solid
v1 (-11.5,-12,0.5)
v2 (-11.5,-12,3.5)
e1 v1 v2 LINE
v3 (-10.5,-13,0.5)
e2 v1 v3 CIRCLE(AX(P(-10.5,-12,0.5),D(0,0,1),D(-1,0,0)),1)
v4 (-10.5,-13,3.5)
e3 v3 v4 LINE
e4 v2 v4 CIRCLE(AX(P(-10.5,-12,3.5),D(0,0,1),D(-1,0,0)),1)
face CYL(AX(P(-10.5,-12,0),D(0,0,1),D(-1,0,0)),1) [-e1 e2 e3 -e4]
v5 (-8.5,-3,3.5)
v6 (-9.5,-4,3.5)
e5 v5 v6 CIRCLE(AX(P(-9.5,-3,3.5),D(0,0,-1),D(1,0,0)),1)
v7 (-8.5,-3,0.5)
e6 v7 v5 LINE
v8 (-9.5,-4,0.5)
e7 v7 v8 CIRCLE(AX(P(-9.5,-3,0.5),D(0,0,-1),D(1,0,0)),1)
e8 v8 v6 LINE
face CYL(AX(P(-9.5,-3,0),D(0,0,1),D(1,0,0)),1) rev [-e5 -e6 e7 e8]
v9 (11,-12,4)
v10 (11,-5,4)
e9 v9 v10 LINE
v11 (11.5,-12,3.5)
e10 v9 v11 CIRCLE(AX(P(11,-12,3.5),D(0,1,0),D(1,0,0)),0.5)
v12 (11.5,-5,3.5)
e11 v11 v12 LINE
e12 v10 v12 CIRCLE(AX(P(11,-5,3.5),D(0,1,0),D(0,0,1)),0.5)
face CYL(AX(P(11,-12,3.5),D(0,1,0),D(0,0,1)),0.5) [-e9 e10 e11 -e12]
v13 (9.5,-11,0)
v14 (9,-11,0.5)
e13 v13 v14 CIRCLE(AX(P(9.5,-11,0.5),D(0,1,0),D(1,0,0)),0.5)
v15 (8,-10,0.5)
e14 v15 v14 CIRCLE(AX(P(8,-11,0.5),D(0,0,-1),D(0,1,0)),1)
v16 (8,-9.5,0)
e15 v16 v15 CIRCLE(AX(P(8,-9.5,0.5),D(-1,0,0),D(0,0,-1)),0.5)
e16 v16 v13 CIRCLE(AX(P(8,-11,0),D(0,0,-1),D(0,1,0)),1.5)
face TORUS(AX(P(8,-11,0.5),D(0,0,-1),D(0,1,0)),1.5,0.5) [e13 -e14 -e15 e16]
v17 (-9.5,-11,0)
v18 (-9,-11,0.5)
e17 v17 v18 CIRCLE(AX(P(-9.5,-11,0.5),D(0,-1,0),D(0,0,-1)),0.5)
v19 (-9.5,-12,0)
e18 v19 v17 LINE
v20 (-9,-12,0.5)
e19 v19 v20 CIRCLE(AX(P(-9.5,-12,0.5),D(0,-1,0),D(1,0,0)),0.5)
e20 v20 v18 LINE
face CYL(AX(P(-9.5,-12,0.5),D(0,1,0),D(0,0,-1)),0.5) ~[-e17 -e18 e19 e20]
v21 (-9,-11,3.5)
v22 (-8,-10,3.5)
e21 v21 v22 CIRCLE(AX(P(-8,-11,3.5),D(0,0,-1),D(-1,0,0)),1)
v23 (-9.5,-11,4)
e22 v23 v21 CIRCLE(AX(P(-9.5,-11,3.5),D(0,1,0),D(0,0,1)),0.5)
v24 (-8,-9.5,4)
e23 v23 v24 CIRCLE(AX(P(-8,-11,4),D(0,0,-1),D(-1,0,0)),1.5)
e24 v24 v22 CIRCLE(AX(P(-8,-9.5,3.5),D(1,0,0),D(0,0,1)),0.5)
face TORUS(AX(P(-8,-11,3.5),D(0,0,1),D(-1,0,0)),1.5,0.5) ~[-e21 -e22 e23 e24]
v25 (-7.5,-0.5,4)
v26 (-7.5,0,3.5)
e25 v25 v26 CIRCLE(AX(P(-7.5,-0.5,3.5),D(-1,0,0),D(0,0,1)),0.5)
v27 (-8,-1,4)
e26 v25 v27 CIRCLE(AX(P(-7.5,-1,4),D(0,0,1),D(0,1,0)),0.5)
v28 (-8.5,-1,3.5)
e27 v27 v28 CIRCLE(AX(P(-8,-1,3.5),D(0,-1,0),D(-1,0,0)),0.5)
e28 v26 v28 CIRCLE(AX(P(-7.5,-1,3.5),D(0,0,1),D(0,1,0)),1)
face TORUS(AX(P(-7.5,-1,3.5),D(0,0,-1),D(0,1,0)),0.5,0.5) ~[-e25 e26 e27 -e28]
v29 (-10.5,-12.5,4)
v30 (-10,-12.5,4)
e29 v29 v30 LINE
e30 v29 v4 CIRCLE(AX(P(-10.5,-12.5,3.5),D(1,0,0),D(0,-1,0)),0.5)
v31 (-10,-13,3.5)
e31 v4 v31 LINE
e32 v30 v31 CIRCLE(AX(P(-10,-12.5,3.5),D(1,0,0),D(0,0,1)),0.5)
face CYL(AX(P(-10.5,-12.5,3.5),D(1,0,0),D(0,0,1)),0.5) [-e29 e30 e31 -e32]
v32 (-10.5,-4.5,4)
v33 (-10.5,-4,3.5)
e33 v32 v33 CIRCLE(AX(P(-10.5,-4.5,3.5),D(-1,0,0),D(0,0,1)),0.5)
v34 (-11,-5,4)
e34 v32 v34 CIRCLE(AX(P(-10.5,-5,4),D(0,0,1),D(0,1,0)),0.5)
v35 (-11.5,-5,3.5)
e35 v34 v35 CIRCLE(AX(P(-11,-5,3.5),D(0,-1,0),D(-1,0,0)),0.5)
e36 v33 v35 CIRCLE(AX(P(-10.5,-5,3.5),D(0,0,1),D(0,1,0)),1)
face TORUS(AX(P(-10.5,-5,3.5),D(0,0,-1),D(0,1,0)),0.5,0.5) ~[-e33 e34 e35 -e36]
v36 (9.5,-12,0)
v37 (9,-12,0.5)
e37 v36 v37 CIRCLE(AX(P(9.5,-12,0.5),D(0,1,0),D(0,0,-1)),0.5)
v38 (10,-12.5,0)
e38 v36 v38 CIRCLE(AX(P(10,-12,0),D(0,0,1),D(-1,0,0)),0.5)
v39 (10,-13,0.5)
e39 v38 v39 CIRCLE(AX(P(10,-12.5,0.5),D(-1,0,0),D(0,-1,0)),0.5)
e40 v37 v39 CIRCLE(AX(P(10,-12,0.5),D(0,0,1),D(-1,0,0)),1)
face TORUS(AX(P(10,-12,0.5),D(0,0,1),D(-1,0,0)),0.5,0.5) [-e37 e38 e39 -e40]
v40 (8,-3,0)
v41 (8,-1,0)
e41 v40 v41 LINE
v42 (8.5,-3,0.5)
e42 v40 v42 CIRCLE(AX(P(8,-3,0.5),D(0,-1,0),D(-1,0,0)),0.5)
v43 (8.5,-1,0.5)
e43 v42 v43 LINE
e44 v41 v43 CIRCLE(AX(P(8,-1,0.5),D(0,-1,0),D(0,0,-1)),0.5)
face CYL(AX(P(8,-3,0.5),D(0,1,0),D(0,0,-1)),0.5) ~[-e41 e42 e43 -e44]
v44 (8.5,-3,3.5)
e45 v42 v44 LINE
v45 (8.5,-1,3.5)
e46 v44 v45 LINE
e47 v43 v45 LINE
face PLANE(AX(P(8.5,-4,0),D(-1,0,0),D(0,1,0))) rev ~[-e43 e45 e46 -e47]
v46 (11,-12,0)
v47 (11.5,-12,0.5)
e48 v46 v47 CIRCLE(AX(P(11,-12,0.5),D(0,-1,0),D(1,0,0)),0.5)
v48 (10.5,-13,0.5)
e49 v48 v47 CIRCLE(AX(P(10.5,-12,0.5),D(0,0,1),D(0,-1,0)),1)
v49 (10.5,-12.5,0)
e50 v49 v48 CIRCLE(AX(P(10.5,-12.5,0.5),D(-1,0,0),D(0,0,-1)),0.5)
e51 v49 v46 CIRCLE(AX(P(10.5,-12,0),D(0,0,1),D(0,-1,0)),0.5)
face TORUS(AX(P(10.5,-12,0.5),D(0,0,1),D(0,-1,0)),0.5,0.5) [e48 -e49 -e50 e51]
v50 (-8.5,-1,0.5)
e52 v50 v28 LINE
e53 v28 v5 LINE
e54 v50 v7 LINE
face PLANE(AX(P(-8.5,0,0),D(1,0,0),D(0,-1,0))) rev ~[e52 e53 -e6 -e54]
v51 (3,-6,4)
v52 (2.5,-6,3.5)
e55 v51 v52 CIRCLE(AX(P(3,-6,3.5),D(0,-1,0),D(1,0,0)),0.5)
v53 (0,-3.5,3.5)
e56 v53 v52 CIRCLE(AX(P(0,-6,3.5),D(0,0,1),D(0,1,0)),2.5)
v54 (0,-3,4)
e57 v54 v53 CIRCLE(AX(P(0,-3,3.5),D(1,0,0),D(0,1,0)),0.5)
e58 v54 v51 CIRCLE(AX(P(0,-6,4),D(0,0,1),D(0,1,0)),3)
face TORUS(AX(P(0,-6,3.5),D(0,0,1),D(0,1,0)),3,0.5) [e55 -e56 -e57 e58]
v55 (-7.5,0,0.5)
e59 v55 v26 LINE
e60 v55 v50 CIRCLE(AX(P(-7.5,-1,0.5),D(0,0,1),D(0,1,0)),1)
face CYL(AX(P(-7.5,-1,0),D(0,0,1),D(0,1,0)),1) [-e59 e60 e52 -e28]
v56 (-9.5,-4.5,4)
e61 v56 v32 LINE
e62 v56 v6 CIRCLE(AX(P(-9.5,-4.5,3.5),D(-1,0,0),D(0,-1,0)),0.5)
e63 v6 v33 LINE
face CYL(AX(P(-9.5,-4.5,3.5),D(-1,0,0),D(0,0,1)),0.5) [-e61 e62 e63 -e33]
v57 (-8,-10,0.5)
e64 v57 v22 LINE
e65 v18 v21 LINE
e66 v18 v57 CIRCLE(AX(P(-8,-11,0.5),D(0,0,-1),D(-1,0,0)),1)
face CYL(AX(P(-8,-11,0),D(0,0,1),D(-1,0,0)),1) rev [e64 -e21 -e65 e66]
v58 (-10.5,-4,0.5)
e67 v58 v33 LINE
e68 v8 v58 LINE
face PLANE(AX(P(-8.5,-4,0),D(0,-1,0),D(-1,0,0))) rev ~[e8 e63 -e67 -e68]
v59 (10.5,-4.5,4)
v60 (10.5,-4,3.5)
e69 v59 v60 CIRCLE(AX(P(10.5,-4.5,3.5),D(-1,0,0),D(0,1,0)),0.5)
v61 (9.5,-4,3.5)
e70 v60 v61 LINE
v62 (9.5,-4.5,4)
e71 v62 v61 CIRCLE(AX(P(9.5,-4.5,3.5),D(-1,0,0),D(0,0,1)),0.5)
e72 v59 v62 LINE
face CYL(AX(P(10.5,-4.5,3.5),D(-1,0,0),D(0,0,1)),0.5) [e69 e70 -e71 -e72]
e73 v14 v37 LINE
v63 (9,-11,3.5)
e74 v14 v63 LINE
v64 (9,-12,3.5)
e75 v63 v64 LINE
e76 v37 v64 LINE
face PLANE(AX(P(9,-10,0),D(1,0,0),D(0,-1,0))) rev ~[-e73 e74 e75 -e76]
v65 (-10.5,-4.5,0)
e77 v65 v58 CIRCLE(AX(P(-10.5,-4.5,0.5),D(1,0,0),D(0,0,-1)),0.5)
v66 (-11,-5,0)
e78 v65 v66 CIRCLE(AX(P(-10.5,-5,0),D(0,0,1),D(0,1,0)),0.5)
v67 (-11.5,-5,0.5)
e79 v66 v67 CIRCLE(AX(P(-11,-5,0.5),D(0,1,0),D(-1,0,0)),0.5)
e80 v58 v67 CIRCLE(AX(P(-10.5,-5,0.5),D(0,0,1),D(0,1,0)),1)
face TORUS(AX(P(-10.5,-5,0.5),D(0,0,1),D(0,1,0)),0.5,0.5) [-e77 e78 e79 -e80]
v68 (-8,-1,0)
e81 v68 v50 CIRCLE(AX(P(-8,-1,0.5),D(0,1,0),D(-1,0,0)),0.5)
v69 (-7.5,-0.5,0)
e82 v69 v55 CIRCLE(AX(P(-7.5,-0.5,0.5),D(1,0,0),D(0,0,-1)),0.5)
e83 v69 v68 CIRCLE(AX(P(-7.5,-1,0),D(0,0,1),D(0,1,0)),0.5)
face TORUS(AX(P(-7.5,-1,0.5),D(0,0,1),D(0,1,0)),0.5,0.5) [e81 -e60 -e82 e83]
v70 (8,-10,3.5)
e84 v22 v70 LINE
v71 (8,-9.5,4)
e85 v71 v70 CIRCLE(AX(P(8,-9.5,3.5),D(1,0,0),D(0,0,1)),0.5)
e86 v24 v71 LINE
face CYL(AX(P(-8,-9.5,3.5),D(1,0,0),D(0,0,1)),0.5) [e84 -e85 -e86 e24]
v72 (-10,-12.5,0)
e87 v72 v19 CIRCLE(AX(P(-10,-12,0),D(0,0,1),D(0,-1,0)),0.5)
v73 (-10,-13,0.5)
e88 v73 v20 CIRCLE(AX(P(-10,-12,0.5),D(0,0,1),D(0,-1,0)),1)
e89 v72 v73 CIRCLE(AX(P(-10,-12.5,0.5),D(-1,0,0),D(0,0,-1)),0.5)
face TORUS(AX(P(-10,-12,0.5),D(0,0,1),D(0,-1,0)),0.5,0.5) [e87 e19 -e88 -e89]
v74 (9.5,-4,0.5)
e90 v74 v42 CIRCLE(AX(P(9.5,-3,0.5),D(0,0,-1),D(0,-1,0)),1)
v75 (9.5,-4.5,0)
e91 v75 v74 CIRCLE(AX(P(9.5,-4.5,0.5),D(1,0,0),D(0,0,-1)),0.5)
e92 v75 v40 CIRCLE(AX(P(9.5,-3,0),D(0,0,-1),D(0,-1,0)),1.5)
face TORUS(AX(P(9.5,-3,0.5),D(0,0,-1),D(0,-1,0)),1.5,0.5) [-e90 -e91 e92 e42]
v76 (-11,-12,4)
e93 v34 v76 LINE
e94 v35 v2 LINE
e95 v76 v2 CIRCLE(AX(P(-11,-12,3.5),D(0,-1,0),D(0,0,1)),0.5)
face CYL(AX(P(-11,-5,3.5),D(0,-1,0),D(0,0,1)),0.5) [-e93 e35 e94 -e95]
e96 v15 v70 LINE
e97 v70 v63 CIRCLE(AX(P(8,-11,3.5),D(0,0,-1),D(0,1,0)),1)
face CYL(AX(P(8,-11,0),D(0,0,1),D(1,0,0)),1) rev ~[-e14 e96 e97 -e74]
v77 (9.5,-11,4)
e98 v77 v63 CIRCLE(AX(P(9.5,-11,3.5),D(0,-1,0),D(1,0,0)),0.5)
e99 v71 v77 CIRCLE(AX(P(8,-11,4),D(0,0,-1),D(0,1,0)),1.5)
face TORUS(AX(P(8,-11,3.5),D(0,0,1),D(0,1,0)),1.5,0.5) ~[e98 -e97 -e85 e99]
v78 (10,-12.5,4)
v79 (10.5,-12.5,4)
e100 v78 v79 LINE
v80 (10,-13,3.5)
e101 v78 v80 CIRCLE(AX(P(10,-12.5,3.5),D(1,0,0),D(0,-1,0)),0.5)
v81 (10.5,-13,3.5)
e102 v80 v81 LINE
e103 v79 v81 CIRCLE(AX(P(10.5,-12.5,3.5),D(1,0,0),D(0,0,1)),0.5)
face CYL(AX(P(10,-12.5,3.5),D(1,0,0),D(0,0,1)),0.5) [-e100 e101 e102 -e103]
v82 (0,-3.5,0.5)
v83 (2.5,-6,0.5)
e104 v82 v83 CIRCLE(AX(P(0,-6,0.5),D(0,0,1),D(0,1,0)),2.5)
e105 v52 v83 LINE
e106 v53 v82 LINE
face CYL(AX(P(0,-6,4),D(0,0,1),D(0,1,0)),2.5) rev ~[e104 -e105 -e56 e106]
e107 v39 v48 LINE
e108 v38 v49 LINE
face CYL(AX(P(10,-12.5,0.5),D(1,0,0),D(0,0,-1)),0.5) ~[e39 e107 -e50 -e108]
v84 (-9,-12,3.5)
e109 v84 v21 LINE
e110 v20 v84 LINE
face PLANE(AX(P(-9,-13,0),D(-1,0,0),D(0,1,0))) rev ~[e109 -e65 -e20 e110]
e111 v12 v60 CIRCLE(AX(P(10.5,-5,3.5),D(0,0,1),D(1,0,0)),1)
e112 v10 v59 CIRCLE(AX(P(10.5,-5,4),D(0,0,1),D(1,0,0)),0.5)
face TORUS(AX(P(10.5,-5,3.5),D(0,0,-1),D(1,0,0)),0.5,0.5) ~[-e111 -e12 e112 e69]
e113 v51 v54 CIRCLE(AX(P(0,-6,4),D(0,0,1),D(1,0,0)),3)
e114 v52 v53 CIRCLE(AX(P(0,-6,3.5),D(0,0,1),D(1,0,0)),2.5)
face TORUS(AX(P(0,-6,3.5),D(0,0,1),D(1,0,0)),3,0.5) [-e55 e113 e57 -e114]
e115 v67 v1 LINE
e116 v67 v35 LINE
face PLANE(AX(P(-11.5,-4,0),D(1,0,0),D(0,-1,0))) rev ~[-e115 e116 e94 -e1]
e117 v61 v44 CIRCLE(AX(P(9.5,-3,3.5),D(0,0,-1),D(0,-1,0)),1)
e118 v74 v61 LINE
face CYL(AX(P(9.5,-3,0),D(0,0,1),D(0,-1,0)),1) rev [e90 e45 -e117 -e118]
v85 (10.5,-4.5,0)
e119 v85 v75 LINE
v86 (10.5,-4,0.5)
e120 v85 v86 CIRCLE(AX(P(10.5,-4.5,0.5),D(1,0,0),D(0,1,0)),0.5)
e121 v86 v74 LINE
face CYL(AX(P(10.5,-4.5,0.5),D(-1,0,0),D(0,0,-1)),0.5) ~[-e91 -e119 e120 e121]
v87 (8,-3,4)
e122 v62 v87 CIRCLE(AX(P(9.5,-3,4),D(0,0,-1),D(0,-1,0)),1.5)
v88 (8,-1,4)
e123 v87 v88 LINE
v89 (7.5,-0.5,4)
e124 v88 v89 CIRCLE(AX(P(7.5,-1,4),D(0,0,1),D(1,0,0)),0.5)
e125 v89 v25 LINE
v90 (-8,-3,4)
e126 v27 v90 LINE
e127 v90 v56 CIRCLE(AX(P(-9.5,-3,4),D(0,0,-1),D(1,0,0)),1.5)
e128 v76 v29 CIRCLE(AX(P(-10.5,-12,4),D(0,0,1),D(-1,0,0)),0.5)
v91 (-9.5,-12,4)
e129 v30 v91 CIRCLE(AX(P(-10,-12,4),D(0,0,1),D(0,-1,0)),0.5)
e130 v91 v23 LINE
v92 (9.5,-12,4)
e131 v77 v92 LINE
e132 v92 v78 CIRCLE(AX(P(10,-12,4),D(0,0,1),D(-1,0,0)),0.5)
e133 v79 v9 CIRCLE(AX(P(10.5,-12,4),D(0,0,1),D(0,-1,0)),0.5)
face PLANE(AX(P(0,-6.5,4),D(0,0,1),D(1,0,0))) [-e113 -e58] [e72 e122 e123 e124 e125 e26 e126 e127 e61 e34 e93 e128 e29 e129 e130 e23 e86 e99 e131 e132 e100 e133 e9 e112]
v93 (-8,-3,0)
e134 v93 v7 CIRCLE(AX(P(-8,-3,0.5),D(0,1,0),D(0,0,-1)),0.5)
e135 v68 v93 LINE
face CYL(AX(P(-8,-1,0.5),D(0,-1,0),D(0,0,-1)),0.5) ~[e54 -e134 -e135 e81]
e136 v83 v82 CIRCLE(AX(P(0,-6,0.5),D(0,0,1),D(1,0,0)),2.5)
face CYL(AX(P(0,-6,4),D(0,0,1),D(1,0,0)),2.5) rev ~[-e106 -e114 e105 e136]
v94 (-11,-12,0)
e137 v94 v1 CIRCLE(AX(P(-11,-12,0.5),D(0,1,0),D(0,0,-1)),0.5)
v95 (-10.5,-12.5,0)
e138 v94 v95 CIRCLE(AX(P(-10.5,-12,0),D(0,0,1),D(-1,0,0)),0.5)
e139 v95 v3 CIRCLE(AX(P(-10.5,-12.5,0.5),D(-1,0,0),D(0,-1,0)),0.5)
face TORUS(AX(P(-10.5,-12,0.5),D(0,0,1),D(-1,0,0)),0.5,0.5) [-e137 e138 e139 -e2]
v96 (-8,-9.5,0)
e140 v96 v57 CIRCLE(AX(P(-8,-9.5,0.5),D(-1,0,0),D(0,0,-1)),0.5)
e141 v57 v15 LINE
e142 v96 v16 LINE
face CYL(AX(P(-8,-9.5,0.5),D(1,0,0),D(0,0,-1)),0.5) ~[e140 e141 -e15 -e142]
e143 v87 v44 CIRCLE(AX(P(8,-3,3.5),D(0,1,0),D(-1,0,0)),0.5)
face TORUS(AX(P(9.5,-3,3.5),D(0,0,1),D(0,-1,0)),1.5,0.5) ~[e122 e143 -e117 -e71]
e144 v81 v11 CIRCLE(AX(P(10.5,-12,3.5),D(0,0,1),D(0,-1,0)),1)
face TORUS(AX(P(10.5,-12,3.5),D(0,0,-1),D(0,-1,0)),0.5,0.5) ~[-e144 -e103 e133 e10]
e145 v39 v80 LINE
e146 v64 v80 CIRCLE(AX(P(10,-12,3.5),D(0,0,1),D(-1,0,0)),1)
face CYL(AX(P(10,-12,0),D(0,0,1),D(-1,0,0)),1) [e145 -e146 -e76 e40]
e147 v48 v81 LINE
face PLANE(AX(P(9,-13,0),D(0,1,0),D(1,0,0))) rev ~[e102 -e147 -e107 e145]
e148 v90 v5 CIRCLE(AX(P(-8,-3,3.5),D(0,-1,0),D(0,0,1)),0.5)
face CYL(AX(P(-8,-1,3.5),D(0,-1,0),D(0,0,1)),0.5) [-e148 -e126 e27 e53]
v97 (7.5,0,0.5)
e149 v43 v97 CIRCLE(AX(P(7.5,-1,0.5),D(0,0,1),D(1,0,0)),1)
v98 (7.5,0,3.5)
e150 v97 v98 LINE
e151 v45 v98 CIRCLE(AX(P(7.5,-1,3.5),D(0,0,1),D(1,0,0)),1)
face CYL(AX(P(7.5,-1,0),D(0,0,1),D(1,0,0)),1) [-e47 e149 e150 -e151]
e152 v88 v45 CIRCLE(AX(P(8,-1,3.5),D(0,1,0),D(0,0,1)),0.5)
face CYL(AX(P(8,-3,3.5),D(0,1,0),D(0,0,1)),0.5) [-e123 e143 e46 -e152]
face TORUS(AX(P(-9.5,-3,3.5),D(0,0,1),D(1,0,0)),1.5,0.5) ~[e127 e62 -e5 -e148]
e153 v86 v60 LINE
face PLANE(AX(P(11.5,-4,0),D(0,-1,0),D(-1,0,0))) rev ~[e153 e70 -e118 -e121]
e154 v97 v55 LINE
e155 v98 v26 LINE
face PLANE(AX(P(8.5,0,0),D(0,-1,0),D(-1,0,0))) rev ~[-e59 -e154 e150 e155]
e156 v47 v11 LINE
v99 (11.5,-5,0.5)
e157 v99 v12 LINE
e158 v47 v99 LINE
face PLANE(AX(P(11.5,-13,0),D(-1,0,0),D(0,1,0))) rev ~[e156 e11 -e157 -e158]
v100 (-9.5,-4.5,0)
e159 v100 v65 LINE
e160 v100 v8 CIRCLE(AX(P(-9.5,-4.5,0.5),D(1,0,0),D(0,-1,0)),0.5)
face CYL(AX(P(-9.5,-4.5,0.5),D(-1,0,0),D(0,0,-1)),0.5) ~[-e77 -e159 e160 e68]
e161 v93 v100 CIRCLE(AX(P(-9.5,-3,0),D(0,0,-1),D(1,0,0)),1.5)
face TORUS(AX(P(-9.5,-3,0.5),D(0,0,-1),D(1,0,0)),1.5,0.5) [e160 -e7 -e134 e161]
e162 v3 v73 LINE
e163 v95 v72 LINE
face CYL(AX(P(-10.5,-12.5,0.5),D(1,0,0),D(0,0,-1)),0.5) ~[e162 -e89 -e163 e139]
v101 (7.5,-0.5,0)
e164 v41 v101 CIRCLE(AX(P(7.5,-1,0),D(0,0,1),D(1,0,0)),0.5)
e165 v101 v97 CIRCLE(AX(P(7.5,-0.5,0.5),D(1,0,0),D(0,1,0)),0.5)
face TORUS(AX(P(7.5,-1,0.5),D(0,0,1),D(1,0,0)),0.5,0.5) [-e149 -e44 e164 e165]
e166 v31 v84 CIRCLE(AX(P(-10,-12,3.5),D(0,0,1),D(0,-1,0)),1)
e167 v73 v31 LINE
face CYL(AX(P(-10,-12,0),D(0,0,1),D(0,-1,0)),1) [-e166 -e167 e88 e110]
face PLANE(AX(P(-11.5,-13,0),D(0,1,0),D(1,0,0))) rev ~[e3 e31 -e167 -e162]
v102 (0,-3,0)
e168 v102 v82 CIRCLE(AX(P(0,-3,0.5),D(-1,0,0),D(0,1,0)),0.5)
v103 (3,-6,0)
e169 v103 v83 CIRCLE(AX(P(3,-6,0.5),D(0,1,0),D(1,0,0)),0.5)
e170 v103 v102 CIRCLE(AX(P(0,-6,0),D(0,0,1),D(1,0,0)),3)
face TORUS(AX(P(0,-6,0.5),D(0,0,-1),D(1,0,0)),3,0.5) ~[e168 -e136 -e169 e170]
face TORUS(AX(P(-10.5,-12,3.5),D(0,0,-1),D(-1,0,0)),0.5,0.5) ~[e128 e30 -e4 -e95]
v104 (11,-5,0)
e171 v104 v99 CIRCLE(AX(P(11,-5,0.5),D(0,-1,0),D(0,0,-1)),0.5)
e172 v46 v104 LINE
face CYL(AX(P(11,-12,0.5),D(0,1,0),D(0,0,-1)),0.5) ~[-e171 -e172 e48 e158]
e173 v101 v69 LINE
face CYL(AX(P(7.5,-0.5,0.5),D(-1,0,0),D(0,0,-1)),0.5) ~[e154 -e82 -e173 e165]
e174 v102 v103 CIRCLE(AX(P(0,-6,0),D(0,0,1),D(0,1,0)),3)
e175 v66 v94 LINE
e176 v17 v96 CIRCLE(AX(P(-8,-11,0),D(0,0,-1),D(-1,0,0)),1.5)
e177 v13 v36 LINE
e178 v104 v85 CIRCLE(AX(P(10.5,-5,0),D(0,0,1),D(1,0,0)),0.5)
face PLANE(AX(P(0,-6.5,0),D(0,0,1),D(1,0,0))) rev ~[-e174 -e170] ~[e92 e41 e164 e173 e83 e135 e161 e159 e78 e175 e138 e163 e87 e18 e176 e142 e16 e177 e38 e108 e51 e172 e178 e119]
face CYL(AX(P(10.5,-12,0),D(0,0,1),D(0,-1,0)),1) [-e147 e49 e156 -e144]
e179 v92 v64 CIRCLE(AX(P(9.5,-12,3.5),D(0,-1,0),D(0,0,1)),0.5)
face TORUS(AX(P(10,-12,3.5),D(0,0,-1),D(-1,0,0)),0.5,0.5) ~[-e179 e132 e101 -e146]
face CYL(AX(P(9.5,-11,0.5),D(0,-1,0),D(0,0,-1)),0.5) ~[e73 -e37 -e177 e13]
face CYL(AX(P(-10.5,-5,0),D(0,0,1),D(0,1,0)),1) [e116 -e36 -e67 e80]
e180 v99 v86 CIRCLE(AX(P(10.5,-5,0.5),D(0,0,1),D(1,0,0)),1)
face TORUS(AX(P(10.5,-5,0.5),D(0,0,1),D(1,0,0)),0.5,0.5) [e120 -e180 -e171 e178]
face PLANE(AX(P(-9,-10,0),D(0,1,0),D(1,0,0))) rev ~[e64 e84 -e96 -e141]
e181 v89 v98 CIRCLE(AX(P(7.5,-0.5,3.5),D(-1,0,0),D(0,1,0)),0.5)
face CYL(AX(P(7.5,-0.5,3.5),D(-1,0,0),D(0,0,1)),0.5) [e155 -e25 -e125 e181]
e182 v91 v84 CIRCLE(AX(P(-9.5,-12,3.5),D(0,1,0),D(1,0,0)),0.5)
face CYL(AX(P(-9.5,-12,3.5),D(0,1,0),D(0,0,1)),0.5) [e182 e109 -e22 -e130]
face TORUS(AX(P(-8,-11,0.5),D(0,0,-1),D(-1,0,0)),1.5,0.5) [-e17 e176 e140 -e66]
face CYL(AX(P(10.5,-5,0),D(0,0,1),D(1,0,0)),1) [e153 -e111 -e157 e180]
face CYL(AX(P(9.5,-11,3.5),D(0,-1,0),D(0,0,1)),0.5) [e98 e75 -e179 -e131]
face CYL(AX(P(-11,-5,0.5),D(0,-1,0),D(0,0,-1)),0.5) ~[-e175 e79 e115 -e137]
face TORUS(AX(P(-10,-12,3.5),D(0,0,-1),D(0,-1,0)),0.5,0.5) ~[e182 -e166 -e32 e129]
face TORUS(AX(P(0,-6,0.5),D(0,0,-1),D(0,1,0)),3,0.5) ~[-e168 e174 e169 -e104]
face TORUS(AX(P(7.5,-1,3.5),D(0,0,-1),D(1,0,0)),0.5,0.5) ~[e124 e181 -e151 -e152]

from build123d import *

# Parameters (mm, degrees)
F1_DEPTH = 4
F2_R     = 1
F3_R     = 0.5
F5_DEPTH = 4.001
F6_R     = 0.5


# Not quite as in the source:
# - a feature names something its author has since deleted; it is built from what else it names


with BuildPart() as f1:
    # F0 (on Top) → F1 (new body)
    with BuildSketch(Plane.XY):
        Polygon((9, -10), (9, -13), (11.5, -13), (11.5, -4), (8.5, -4), (8.5, 0), (-8.5, 0), (-8.5, -4), (-11.5, -4), (-11.5, -13), (-9, -13), (-9, -10), align=None)
    extrude(amount=F1_DEPTH)

    # F2
    f2_edges = [f1.edges().sort_by_distance(p)[0] for p in [
        (-9, -13, 2),
        (-9, -10, 2),
        (9, -10, 2),
        (9, -13, 2),
        (-11.5, -4, 2),
        (-8.5, -4, 2),
        (-8.5, 0, 2),
        (8.5, 0, 2),
        (8.5, -4, 2),
        (11.5, -4, 2),
        (11.5, -13, 2),
        (-11.5, -13, 2),
    ]]
    fillet(f2_edges, radius=F2_R)

    # F3
    f3_edges = [f1.edges().sort_by_distance(p)[0] for p in [
        (0, -10, 4),
        (-9, -11.5, 4),
        (9, -11.5, 4),
        (8.707107, -10.292893, 4),
        (9.292893, -12.707107, 4),
        (10.25, -13, 4),
        (-8.707107, -10.292893, 4),
        (11.207107, -12.707107, 4),
        (11.5, -8.5, 4),
        (-9.292893, -12.707107, 4),
        (11.207107, -4.292893, 4),
        (-10.25, -13, 4),
        (10, -4, 4),
        (-11.207107, -12.707107, 4),
        (8.792893, -3.707107, 4),
        (-11.5, -8.5, 4),
        (8.5, -2, 4),
        (-11.207107, -4.292893, 4),
        (8.207107, -0.292893, 4),
        (-10, -4, 4),
        (0, 0, 4),
        (-8.792893, -3.707107, 4),
        (-8.207107, -0.292893, 4),
        (-8.5, -2, 4),
        (0, -10, 0),
        (10.25, -13, 0),
        (9, -11.5, 0),
        (-9, -11.5, 0),
        (-10.25, -13, 0),
    ]]
    fillet(f3_edges, radius=F3_R)

    # F4 (on face) → F5 (cut, through all)
    with BuildSketch(Plane.XY.offset(4)):
        with BuildLine():
            ThreePointArc((2.5, -6), (1.767766953, -4.232233047), (0, -3.5))
            ThreePointArc((0, -3.5), (-1.767766953, -7.767766953), (2.5, -6))
        make_face()
    extrude(amount=-F5_DEPTH, mode=Mode.SUBTRACT)

    # F6
    f6_edges = [f1.edges().sort_by_distance(p)[0] for p in [
        (-2.5, -6, 4),
        (-2.5, -6, 0),
    ]]
    fillet(f6_edges, radius=F6_R)


solid = f1.part
